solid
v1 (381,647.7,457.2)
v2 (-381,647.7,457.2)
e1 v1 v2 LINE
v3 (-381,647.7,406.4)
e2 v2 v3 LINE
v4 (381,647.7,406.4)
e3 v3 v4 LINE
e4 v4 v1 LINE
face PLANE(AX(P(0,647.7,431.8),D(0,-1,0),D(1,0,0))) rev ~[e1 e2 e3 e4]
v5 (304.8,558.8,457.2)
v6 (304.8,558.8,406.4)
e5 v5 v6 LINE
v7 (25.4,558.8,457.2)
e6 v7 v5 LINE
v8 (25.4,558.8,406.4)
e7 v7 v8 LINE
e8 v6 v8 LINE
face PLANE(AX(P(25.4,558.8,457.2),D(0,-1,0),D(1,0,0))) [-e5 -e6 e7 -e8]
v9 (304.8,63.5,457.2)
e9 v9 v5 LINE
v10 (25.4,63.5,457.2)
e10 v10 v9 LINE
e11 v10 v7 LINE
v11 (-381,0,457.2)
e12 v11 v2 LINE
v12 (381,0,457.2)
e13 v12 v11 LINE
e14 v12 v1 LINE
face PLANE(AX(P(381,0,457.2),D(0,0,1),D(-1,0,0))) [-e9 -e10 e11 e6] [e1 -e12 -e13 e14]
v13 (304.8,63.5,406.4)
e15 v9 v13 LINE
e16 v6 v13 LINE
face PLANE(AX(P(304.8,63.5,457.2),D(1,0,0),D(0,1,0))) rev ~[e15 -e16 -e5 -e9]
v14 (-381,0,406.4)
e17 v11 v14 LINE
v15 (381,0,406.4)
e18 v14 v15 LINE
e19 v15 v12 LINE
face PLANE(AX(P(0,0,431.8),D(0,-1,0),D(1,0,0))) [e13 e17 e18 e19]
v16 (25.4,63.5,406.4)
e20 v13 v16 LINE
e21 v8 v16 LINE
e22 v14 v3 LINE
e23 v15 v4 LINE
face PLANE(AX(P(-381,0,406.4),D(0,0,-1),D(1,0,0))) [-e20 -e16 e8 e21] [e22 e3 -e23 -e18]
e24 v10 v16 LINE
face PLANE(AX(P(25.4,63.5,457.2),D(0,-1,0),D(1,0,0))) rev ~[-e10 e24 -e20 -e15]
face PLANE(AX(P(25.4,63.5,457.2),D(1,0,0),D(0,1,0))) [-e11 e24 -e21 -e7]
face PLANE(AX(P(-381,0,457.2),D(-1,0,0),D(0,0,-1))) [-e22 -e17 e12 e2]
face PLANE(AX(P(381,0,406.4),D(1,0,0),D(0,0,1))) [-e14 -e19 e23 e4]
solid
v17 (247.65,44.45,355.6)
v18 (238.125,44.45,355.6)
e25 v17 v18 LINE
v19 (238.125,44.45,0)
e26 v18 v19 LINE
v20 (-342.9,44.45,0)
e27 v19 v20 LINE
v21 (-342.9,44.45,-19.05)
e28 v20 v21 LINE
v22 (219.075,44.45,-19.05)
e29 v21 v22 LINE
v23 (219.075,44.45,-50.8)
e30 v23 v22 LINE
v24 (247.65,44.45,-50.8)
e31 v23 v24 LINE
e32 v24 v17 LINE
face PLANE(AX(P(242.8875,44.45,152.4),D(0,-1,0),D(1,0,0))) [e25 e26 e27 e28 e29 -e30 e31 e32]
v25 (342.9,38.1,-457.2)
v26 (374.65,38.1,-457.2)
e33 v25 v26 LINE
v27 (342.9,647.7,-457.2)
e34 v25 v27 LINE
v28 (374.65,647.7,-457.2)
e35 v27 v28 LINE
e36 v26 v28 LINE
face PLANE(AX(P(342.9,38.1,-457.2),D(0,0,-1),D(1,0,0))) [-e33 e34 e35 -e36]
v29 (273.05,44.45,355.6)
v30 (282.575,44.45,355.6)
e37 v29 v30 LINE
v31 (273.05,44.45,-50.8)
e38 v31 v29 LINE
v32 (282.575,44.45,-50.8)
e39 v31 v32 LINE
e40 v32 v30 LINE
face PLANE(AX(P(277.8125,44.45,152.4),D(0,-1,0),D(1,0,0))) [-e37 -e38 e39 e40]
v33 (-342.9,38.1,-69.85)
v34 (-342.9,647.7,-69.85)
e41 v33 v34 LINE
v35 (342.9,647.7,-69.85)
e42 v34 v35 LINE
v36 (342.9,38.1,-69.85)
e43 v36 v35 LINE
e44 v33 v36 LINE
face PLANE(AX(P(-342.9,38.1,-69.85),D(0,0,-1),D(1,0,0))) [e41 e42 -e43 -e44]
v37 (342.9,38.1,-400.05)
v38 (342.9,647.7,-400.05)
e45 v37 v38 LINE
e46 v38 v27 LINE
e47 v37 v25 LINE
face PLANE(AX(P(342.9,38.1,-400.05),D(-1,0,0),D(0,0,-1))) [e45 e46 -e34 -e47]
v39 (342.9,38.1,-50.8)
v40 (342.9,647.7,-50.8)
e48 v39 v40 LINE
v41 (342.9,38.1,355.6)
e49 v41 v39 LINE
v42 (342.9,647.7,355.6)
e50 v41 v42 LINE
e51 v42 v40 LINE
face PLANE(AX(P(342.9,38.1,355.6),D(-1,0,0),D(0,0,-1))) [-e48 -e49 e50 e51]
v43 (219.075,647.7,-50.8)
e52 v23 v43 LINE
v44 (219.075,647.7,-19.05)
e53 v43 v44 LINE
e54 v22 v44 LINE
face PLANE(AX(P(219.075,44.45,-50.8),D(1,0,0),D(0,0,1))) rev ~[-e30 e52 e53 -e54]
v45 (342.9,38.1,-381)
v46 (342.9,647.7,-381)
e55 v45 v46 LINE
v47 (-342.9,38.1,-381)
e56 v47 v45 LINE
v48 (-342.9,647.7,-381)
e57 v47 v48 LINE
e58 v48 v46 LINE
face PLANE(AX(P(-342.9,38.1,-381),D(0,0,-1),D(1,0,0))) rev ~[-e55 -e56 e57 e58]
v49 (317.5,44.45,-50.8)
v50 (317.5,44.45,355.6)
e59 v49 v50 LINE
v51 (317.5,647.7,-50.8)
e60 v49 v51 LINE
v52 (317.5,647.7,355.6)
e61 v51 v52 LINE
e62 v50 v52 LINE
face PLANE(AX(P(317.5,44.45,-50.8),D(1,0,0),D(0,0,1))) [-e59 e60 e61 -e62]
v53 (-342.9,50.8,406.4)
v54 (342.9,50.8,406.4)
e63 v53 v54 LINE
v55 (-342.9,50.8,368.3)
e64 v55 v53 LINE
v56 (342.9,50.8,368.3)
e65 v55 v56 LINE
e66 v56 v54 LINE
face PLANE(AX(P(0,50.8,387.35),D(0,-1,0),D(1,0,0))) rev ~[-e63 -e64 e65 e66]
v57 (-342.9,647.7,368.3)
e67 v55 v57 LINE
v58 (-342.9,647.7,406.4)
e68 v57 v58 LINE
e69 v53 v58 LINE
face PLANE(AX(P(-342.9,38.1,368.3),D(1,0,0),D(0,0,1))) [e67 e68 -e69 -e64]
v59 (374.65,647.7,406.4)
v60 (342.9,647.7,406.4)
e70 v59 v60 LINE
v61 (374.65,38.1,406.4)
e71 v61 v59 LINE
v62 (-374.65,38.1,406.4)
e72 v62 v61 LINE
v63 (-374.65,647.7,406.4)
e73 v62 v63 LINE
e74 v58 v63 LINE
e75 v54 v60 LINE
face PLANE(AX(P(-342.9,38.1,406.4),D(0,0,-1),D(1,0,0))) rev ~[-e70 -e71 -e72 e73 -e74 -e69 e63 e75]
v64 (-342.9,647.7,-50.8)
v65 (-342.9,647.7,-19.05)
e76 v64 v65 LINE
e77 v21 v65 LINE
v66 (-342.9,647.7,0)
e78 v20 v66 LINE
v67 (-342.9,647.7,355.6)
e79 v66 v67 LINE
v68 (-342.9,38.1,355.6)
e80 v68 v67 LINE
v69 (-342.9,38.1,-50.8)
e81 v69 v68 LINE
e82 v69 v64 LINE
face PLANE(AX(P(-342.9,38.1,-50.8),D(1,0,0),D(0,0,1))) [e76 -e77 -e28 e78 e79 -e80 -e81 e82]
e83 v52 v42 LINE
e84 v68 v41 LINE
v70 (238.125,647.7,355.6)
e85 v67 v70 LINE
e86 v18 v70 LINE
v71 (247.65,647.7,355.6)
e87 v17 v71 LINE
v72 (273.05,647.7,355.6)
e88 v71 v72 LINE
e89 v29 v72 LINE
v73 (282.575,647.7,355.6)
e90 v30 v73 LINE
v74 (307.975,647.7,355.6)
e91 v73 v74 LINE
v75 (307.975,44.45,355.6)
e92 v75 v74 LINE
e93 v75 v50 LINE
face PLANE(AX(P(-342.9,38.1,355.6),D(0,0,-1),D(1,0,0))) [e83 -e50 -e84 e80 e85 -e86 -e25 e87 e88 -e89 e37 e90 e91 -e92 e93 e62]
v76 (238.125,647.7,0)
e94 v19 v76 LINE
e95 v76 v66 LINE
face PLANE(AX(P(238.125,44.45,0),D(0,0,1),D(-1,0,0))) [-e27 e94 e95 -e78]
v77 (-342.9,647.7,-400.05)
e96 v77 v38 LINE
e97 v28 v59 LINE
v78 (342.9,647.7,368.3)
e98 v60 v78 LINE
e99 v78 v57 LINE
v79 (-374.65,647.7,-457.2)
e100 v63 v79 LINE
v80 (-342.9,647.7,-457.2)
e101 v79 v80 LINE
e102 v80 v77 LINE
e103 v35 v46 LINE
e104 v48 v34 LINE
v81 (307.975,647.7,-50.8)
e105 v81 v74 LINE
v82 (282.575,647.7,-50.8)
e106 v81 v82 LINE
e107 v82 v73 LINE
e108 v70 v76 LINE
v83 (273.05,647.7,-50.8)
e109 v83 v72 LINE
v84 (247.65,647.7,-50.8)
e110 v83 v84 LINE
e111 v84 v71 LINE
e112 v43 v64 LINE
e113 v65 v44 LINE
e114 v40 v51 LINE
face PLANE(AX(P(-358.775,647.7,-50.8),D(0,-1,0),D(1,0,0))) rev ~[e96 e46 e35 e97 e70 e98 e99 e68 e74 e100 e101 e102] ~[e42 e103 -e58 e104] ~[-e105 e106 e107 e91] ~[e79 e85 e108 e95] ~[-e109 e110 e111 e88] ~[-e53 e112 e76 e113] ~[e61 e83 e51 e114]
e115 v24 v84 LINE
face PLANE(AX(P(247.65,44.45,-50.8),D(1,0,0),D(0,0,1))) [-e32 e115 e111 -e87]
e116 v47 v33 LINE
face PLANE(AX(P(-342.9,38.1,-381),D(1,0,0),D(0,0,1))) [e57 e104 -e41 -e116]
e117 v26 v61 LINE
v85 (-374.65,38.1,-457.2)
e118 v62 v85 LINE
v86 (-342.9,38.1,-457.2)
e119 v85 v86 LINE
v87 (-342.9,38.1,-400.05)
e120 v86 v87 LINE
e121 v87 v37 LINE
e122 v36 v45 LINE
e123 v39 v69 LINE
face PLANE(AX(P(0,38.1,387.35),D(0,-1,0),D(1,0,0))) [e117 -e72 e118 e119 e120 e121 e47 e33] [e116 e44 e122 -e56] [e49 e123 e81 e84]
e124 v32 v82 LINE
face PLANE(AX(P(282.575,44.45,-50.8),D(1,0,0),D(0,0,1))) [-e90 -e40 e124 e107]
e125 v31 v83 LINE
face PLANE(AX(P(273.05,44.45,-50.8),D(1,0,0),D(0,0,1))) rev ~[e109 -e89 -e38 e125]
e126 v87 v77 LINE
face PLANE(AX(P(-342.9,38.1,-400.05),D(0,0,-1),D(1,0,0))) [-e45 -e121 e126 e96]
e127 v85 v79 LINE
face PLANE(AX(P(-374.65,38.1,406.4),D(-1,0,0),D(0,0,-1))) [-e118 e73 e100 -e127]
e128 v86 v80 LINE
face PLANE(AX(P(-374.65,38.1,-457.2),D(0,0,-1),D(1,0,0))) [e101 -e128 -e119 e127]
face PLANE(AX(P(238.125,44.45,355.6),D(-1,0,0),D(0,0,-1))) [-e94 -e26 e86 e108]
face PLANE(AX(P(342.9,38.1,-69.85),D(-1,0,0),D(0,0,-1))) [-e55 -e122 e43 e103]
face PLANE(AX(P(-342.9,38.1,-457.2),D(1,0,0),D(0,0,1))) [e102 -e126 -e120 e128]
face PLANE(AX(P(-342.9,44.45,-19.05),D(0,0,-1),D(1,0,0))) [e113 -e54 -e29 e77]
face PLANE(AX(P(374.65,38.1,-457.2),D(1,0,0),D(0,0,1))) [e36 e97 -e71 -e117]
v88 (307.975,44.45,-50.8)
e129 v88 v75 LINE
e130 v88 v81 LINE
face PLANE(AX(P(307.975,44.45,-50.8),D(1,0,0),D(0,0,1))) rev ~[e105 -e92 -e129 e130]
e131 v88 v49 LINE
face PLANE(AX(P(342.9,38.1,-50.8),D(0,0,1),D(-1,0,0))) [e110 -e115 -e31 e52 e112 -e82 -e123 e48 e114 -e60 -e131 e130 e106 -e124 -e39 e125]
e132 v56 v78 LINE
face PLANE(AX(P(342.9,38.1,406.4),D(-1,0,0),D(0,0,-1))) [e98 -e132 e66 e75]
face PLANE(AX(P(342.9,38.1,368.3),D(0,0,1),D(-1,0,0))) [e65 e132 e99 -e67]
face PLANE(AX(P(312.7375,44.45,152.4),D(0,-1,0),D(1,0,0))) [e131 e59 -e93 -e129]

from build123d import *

# Parameters (mm, degrees)
F1_START = -38.1
F0_W     = 685.8
F0_H     = 19.05
F1_DEPTH = 609.6
F2_START = -44.45
F0_W_2   = 9.525
F0_H_2   = 406.4
F0_W_3   = 19.05
F0_H_3   = 31.75
F2_DEPTH = 603.25
F3_DEPTH = 647.7
F4_W     = 279.4
F4_H     = 495.3
F5_DEPTH = 914.401
F6_START = -38.1
F0_H_4   = 38.1
F6_DEPTH = 12.7


# Not quite as in the source:
# - a feature names something its author has since deleted; it is built from what else it names


with BuildPart() as f1:
    # F0 (on Front) → F1 (new body)
    with BuildSketch(Plane.XZ.offset(F1_START)):
        Polygon((-342.9, 355.6), (-374.65, 355.6), (-374.65, -457.2), (-342.9, -457.2), (-342.9, -400.05), (-342.9, -381), (-342.9, -69.85), (-342.9, -50.8), (-342.9, -19.05), (-342.9, 0), align=None)
        Polygon((342.9, -69.85), (342.9, -50.8), (317.5, -50.8), (307.975, -50.8), (282.575, -50.8), (273.05, -50.8), (247.65, -50.8), (238.125, -50.8), (219.075, -50.8), (-342.9, -50.8), (-342.9, -69.85), align=None)
        with Locations((0, -390.525)):
            Rectangle(F0_W, F0_H)
        Polygon((-342.9, 406.4), (-374.65, 406.4), (-374.65, 355.6), (-342.9, 355.6), (-342.9, 368.3), align=None)
        Polygon((374.65, 355.6), (374.65, 406.4), (342.9, 406.4), (342.9, 368.3), (342.9, 355.6), align=None)
        Polygon((-342.9, 368.3), (-342.9, 355.6), (238.125, 355.6), (247.65, 355.6), (273.05, 355.6), (282.575, 355.6), (307.975, 355.6), (317.5, 355.6), (342.9, 355.6), (342.9, 368.3), align=None)
        Polygon((374.65, -457.2), (374.65, 355.6), (342.9, 355.6), (342.9, -50.8), (342.9, -69.85), (342.9, -381), (342.9, -400.05), (342.9, -457.2), align=None)
    extrude(amount=-F1_DEPTH)

    # F0 (on Front) → F2 (join)
    with BuildSketch(Plane.XZ.offset(F2_START)):
        Polygon((247.65, 355.6), (238.125, 355.6), (238.125, 0), (238.125, -19.05), (238.125, -50.8), (247.65, -50.8), align=None)
        with Locations((277.8125, 152.4)):
            Rectangle(F0_W_2, F0_H_2)
        with Locations((312.7375, 152.4)):
            Rectangle(F0_W_2, F0_H_2)
        Polygon((238.125, 0), (-342.9, 0), (-342.9, -19.05), (219.075, -19.05), (238.125, -19.05), align=None)
        with Locations((228.6, -34.925)):
            Rectangle(F0_W_3, F0_H_3)
    extrude(amount=-F2_DEPTH)

    # F0 (on Front) → F6 (join)
    with BuildSketch(Plane.XZ.offset(F6_START)):
        with Locations((0, 387.35)):
            Rectangle(F0_W, F0_H_4)
    extrude(amount=-F6_DEPTH)


with BuildPart() as f3:
    # F0 (on Front) → F3 (new body, through all)
    with BuildSketch(Plane.XZ):
        Polygon((374.65, 457.2), (-374.65, 457.2), (-381, 457.2), (-381, 406.4), (-374.65, 406.4), (-342.9, 406.4), (342.9, 406.4), (374.65, 406.4), (381, 406.4), (381, 457.2), align=None)
    extrude(amount=-F3_DEPTH)

    # F4 (on face) → F5 (cut, through all)
    with BuildSketch(Plane.XY.offset(457.2)):
        with Locations((165.1, 311.15)):
            Rectangle(F4_W, F4_H)
    extrude(amount=-F5_DEPTH, mode=Mode.SUBTRACT)


solid = Compound([f1.part, f3.part])
